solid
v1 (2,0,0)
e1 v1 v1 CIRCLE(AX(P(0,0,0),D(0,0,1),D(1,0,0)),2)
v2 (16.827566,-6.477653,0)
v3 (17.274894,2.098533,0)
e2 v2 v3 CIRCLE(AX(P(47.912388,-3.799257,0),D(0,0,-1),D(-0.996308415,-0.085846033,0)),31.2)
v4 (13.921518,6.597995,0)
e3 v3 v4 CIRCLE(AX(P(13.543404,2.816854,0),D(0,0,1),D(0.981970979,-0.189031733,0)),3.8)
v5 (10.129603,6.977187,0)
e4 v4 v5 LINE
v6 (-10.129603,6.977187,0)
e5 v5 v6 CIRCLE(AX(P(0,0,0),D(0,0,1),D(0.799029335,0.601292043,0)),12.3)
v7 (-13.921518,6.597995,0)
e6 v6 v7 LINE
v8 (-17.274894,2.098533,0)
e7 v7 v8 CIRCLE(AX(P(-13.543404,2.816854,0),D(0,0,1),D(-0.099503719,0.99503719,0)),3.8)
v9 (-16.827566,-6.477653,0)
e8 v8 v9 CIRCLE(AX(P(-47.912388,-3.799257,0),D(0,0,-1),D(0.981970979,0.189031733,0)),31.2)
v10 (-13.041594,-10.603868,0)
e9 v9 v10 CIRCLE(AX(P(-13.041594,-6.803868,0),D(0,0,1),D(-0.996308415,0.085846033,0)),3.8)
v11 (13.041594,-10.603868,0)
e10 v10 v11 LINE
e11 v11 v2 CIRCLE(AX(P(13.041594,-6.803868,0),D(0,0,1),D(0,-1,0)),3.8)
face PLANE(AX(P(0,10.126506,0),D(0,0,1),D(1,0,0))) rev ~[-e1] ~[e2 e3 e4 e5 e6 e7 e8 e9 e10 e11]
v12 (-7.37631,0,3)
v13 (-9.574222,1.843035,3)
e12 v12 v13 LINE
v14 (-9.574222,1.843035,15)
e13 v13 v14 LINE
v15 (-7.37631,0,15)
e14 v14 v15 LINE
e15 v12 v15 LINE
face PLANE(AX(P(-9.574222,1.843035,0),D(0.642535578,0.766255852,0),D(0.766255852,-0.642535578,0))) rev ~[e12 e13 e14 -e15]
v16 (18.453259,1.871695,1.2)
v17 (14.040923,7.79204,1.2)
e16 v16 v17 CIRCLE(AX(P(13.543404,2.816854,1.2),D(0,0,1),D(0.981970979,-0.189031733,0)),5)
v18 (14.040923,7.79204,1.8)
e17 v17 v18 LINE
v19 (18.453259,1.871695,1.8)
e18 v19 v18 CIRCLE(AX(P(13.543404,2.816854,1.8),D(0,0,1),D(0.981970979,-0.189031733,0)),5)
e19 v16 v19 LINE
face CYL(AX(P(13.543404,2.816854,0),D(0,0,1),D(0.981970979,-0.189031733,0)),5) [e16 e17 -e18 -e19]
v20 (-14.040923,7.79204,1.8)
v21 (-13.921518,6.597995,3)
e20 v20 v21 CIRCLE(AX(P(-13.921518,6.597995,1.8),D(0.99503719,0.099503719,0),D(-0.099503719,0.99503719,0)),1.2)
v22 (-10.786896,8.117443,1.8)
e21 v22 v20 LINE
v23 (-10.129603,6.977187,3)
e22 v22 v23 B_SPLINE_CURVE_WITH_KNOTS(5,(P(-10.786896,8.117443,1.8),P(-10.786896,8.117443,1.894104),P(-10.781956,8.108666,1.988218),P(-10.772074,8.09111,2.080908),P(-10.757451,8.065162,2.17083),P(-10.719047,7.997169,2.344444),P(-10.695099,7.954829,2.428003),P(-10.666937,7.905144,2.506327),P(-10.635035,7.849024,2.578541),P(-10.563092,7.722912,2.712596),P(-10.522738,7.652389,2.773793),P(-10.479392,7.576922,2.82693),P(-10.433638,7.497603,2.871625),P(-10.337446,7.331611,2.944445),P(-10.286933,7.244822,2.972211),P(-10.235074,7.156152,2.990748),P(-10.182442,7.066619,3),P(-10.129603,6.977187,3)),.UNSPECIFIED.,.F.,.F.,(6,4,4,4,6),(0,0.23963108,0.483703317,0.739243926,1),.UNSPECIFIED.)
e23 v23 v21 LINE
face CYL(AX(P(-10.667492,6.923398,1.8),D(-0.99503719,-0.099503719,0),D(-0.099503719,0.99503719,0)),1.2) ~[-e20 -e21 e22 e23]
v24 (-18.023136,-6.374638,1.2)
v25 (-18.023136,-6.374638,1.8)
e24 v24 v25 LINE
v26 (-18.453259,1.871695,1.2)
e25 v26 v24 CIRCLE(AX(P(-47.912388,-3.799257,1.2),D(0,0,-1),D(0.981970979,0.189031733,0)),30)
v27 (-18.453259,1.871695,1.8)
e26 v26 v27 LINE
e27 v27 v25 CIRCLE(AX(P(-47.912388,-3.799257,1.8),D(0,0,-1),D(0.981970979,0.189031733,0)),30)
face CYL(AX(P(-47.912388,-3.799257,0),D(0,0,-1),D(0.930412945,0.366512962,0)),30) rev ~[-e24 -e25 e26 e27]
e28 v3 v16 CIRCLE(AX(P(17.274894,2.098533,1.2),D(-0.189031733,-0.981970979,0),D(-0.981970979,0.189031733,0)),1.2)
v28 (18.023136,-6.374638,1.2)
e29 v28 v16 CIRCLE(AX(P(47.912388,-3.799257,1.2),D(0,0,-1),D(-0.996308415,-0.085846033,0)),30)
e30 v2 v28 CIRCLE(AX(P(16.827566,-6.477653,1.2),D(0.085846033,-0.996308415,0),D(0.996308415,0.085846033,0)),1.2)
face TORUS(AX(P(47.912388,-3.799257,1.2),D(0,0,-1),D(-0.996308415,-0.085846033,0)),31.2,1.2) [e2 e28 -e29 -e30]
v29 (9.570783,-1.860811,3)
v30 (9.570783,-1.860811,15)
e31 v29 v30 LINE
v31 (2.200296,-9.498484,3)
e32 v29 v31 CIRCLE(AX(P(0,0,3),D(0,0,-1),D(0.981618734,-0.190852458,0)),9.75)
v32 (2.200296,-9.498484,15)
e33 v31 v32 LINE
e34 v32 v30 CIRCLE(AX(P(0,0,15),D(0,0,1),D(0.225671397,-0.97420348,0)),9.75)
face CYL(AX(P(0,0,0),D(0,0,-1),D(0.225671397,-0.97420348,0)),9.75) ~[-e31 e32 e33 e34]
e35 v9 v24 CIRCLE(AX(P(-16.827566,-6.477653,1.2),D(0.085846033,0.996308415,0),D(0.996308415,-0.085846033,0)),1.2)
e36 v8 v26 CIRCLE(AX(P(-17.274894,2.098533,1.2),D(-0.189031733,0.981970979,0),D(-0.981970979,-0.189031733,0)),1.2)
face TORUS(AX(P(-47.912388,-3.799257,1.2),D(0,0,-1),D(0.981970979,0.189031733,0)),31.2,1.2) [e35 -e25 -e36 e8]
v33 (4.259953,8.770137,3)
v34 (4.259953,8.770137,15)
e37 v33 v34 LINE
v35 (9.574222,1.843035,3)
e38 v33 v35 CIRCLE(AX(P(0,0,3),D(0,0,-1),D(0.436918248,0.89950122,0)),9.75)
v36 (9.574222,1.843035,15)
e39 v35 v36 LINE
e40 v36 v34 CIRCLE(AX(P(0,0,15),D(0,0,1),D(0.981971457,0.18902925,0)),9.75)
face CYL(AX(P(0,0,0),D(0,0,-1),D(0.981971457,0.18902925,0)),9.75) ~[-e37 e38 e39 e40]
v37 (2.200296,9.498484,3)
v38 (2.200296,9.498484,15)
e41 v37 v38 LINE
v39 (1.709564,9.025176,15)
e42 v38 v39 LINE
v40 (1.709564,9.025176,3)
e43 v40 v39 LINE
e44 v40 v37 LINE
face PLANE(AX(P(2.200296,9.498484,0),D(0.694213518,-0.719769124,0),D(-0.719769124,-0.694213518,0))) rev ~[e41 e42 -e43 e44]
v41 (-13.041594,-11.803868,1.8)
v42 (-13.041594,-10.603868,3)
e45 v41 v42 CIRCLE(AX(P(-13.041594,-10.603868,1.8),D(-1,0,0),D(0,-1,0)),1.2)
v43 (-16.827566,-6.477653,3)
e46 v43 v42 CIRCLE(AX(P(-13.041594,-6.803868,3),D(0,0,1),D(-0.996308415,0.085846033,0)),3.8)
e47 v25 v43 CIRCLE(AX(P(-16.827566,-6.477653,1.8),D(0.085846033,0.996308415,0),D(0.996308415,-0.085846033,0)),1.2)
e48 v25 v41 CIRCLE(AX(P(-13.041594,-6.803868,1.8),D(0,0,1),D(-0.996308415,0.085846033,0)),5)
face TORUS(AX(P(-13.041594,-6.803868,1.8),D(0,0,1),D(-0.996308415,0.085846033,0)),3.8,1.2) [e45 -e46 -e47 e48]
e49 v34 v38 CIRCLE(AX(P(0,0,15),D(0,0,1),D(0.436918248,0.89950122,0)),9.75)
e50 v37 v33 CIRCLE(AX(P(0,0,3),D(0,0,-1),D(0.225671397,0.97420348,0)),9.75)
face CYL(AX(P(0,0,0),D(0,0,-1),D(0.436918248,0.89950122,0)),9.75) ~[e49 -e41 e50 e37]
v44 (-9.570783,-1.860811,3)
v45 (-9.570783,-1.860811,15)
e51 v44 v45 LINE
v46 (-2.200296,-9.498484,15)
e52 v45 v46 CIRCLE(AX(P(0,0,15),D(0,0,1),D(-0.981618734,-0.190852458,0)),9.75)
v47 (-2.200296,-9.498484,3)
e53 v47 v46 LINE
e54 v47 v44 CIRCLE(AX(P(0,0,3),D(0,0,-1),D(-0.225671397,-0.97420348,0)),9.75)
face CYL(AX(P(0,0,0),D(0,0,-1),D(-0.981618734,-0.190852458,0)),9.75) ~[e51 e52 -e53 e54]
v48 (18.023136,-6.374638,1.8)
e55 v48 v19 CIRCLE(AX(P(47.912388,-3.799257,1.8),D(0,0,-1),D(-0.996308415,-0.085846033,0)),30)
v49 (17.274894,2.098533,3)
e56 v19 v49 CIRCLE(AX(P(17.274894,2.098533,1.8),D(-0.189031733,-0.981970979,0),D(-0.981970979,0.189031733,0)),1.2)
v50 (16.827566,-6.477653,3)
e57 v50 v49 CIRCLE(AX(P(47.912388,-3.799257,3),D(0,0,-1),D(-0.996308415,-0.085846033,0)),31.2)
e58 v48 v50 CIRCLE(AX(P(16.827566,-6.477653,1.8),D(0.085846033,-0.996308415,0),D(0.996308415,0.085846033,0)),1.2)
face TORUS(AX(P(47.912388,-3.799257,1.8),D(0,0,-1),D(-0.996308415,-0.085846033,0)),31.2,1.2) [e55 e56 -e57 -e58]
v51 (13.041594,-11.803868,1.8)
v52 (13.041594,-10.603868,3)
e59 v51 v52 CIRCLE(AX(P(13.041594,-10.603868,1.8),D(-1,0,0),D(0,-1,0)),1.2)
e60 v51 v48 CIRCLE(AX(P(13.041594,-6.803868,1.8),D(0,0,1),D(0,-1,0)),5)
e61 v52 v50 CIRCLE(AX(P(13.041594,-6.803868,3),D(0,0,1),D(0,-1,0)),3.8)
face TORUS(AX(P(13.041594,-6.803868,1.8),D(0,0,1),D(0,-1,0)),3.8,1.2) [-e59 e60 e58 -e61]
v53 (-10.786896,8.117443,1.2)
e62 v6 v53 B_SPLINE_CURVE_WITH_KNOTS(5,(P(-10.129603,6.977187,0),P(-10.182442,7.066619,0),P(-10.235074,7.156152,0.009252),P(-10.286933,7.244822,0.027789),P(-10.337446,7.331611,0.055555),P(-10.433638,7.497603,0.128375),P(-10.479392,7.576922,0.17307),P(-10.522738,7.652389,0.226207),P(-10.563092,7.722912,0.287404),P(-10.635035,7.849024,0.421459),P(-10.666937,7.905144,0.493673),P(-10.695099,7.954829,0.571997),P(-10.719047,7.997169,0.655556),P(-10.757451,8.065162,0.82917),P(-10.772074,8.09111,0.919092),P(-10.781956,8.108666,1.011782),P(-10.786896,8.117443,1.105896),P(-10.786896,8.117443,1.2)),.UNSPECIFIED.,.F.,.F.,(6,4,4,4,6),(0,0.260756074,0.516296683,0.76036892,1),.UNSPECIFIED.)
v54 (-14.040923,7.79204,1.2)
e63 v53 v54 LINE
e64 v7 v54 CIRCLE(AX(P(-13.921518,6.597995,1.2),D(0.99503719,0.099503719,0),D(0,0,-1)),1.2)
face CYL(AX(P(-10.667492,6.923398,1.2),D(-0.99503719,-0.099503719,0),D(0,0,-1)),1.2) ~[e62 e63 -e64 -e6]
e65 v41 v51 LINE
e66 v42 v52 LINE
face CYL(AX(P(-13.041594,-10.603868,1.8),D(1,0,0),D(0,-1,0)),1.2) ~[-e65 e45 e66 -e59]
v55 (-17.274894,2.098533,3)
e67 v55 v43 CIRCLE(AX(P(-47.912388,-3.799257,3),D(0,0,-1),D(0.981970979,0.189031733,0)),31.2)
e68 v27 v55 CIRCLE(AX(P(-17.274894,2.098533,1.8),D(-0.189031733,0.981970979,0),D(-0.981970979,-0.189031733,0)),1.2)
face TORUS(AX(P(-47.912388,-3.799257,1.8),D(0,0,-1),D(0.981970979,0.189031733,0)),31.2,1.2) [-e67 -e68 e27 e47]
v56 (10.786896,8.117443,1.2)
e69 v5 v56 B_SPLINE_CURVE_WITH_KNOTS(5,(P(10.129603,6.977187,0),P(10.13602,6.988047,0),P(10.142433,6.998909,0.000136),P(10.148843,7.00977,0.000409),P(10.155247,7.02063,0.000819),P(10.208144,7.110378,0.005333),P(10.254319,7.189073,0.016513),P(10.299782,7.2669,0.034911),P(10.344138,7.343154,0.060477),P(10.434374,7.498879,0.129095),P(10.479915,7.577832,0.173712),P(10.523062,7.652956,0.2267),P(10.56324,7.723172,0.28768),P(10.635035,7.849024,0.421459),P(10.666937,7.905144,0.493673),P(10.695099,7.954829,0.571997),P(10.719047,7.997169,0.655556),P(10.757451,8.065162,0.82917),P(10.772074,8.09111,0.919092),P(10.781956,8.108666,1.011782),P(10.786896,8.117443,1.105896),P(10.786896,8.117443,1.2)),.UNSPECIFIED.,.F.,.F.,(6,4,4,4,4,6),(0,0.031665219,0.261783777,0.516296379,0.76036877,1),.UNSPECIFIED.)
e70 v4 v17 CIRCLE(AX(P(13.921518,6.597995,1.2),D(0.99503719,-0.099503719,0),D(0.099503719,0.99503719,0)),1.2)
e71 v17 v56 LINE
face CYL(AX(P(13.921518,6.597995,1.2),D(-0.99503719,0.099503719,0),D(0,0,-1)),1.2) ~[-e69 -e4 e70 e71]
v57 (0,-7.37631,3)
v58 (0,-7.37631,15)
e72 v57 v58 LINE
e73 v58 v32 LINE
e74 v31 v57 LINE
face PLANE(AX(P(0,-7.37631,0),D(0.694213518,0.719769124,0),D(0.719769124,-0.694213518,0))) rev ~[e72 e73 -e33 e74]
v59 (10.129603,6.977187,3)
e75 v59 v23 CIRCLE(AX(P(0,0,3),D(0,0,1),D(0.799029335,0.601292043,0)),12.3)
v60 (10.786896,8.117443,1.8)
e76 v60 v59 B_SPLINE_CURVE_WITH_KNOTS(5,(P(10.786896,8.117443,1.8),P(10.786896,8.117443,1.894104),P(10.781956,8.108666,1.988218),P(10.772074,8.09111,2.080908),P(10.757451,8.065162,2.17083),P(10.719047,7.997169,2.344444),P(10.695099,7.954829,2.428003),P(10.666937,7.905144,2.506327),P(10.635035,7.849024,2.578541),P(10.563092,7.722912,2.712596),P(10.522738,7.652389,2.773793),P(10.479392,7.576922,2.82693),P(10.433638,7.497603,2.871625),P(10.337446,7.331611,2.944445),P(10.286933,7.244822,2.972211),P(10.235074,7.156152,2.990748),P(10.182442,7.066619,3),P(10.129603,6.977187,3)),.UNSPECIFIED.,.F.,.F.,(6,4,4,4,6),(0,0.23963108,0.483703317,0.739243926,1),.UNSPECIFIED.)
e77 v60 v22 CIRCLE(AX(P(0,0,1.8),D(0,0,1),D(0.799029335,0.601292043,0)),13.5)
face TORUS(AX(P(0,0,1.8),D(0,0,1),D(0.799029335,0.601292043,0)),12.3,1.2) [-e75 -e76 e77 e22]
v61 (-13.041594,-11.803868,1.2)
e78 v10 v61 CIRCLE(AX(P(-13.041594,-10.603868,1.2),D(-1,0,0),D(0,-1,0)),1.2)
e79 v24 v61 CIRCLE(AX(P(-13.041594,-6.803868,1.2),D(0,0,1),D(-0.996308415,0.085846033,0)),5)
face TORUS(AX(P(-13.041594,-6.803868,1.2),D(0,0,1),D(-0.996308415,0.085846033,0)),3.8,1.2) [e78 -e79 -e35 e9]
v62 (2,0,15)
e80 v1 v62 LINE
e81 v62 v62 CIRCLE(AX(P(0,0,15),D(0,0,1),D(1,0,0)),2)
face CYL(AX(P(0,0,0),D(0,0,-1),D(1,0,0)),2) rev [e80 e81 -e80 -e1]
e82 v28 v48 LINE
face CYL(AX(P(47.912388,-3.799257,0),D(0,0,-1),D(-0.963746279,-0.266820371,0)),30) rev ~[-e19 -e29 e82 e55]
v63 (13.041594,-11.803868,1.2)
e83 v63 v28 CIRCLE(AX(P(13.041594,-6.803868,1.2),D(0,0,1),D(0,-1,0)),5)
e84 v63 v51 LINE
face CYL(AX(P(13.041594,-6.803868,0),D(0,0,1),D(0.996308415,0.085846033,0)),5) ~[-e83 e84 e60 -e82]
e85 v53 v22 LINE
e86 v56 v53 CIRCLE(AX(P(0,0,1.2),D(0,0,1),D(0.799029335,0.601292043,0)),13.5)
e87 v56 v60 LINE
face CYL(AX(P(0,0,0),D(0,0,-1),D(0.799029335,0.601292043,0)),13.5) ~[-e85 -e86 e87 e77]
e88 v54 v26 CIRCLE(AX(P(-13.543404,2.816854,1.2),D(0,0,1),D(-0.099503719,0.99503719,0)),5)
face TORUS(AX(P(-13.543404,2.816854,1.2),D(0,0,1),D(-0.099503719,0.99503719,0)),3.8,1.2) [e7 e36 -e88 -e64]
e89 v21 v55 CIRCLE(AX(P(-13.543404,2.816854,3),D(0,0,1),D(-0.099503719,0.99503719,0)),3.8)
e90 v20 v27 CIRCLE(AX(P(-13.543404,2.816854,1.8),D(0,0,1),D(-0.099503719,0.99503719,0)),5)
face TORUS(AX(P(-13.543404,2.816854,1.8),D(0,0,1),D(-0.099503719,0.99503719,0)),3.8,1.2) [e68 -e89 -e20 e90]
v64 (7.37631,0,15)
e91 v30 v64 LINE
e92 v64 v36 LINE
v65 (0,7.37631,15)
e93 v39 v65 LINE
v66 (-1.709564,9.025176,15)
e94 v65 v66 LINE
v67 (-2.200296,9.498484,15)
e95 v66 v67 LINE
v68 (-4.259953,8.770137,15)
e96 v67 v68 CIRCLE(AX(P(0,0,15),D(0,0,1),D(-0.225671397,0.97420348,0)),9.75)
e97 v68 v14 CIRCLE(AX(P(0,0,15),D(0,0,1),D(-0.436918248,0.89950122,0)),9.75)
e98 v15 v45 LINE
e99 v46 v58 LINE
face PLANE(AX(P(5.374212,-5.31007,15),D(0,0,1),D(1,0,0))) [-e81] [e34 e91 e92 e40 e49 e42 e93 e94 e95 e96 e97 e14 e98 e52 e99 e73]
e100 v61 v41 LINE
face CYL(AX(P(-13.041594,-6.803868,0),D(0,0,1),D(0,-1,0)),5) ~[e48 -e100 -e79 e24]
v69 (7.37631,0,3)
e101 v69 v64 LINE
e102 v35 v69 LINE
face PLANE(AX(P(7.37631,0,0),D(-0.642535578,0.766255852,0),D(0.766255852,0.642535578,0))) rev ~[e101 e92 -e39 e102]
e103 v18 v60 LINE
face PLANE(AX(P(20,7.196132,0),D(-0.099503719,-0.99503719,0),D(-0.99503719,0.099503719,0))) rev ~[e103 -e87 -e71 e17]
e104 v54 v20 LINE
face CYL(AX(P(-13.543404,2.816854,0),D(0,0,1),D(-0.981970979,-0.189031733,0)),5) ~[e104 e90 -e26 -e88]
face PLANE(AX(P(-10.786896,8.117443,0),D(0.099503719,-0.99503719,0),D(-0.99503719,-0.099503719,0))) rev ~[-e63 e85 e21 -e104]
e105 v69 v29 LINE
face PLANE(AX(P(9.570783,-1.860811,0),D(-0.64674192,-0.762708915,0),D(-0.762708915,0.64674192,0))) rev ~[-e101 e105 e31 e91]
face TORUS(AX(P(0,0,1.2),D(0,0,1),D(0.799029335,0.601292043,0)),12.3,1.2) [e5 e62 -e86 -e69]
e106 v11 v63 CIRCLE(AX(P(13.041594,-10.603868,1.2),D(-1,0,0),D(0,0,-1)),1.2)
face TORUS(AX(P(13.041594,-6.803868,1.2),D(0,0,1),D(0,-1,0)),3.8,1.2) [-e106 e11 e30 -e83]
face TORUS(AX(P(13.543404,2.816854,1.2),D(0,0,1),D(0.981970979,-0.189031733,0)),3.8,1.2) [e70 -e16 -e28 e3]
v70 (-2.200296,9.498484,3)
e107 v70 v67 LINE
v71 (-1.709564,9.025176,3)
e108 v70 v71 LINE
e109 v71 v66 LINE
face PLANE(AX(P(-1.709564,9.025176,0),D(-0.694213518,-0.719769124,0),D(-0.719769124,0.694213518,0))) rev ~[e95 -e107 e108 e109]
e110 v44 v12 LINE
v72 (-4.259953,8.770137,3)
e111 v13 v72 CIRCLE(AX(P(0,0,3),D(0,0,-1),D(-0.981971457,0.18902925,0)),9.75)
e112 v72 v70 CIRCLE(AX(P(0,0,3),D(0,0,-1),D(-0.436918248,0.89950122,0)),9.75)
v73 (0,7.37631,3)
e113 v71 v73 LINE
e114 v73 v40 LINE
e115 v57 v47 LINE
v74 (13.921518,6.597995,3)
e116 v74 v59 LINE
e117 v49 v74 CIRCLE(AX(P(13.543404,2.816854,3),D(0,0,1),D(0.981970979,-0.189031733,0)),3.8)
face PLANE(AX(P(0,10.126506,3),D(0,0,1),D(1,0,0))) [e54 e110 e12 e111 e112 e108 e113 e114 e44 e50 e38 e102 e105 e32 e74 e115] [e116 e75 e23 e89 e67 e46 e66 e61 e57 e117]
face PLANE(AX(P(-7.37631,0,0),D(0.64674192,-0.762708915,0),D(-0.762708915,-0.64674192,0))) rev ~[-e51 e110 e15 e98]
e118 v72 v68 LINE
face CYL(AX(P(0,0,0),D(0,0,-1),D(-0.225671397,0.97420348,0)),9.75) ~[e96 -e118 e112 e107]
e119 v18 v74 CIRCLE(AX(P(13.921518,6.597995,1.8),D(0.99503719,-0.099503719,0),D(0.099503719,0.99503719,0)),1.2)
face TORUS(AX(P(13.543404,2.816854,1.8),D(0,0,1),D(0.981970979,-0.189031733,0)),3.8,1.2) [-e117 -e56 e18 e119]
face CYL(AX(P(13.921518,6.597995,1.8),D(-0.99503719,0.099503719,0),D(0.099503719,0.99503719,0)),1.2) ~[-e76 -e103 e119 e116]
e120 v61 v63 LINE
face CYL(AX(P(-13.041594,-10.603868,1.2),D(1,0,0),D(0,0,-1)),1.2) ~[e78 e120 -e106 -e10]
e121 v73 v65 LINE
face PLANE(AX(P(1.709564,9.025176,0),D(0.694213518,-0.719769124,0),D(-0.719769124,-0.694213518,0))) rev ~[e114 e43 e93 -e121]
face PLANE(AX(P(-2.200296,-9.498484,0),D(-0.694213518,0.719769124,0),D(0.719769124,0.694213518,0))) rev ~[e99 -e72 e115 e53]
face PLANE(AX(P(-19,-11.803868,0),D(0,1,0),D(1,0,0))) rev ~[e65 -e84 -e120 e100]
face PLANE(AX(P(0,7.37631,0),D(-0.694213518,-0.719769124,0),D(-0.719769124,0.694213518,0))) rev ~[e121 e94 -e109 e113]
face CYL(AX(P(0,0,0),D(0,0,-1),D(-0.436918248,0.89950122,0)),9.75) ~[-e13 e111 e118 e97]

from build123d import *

# Parameters (mm, degrees)
F0_R     = 2
F1_DEPTH = 15
F2_DEPTH = 3
F3_R     = 5
F4_R     = 5
F5_R     = 1.2


with BuildPart() as f1:
    # F0 (on Top) → F1 (new body)
    with BuildSketch(Plane.XY):
        with BuildLine():
            Line((9.5707826587, -1.8608114628), (7.3763099499, 0))
            ThreePointArc((7.3763099499, 0), (5.2158387857, -5.2158387857), (0, -7.3763099499))
            Line((0, -7.3763099499), (2.2002961183, -9.4984839312))
            ThreePointArc((2.2002961183, -9.4984839312), (7.0159164816, -6.770481218), (9.5707826587, -1.8608114628))
        make_face()
        with BuildLine():
            ThreePointArc((0, -7.3763099499), (5.2158387857, -5.2158387857), (7.3763099499, 0))
            ThreePointArc((7.3763099499, 0), (5.2158387857, 5.2158387857), (0, 7.3763099499))
            ThreePointArc((0, 7.3763099499), (-5.2158387857, 5.2158387857), (-7.3763099499, 0))
            ThreePointArc((-7.3763099499, 0), (-5.2158387857, -5.2158387857), (0, -7.3763099499))
        make_face()
        Circle(F0_R, mode=Mode.SUBTRACT)
        with BuildLine():
            ThreePointArc((9.5742217065, 1.8430351908), (7.7357792995, 5.9346624697), (4.2599529151, 8.7701368952))
            Line((4.2599529151, 8.7701368952), (1.7095643673, 9.02517575))
            Line((1.7095643673, 9.02517575), (0, 7.3763099499))
            ThreePointArc((0, 7.3763099499), (5.2158387857, 5.2158387857), (7.3763099499, 0))
            Line((7.3763099499, 0), (9.5742217065, 1.8430351908))
        make_face()
        with BuildLine():
            Line((1.7095643673, 9.02517575), (4.2599529151, 8.7701368952))
            ThreePointArc((4.2599529151, 8.7701368952), (3.2505886766, 9.1921800056), (2.2002961183, 9.4984839312))
            Line((2.2002961183, 9.4984839312), (1.7095643673, 9.02517575))
        make_face()
        with BuildLine():
            Line((-1.7095643673, 9.02517575), (-4.2599529151, 8.7701368952))
            ThreePointArc((-4.2599529151, 8.7701368952), (-7.7357792995, 5.9346624697), (-9.5742217065, 1.8430351908))
            Line((-9.5742217065, 1.8430351908), (-7.3763099499, 0))
            ThreePointArc((-7.3763099499, 0), (-5.2158387857, 5.2158387857), (0, 7.3763099499))
            Line((0, 7.3763099499), (-1.7095643673, 9.02517575))
        make_face()
        with BuildLine():
            ThreePointArc((-2.2002961183, 9.4984839312), (-3.2505886766, 9.1921800056), (-4.2599529151, 8.7701368952))
            Line((-4.2599529151, 8.7701368952), (-1.7095643673, 9.02517575))
            Line((-1.7095643673, 9.02517575), (-2.2002961183, 9.4984839312))
        make_face()
        with BuildLine():
            Line((-7.3763099499, 0), (-9.5707826587, -1.8608114628))
            ThreePointArc((-9.5707826587, -1.8608114628), (-7.0159164816, -6.770481218), (-2.2002961183, -9.4984839312))
            Line((-2.2002961183, -9.4984839312), (0, -7.3763099499))
            ThreePointArc((0, -7.3763099499), (-5.2158387857, -5.2158387857), (-7.3763099499, 0))
        make_face()
    extrude(amount=F1_DEPTH)

    # F0 (on Top) → F2 (join)
    with BuildSketch(Plane.XY):
        with BuildLine():
            Line((4.2599529151, 8.7701368952), (10.7868960269, 8.1174425841))
            ThreePointArc((10.7868960269, 8.1174425841), (0, 13.5), (-10.7868960269, 8.1174425841))
            Line((-10.7868960269, 8.1174425841), (-4.2599529151, 8.7701368952))
            ThreePointArc((-4.2599529151, 8.7701368952), (-3.2505886766, 9.1921800056), (-2.2002961183, 9.4984839312))
            ThreePointArc((-2.2002961183, 9.4984839312), (0, 9.75), (2.2002961183, 9.4984839312))
            ThreePointArc((2.2002961183, 9.4984839312), (3.2505886766, 9.1921800056), (4.2599529151, 8.7701368952))
        make_face()
        Polygon((0, 7.3763099499), (1.7095643673, 9.02517575), (0, 9.1961321867), (-1.7095643673, 9.02517575), align=None)
        with BuildLine():
            Line((1.7095643673, 9.02517575), (2.2002961183, 9.4984839312))
            ThreePointArc((2.2002961183, 9.4984839312), (0, 9.75), (-2.2002961183, 9.4984839312))
            Line((-2.2002961183, 9.4984839312), (-1.7095643673, 9.02517575))
            Line((-1.7095643673, 9.02517575), (0, 9.1961321867))
            Line((0, 9.1961321867), (1.7095643673, 9.02517575))
        make_face()
        with BuildLine():
            ThreePointArc((8.2654431298, -10.6739144585), (12.1209216286, -5.9441785701), (13.5, 0))
            ThreePointArc((13.5, 0), (12.8037708579, 4.2794219024), (10.7868960269, 8.1174425841))
            Line((10.7868960269, 8.1174425841), (4.2599529151, 8.7701368952))
            ThreePointArc((4.2599529151, 8.7701368952), (7.7357792995, 5.9346624697), (9.5742217065, 1.8430351908))
            ThreePointArc((9.5742217065, 1.8430351908), (9.7059559457, 0.9256992928), (9.75, 0))
            ThreePointArc((9.75, 0), (9.7050922438, -0.9347109387), (9.5707826587, -1.8608114628))
            ThreePointArc((9.5707826587, -1.8608114628), (7.0159164816, -6.770481218), (2.2002961183, -9.4984839312))
            ThreePointArc((2.2002961183, -9.4984839312), (0, -9.75), (-2.2002961183, -9.4984839312))
            ThreePointArc((-2.2002961183, -9.4984839312), (-7.0159164816, -6.770481218), (-9.5707826587, -1.8608114628))
            ThreePointArc((-9.5707826587, -1.8608114628), (-9.7499957971, -0.0090529401), (-9.5742217065, 1.8430351908))
            ThreePointArc((-9.5742217065, 1.8430351908), (-7.7357792995, 5.9346624697), (-4.2599529151, 8.7701368952))
            Line((-4.2599529151, 8.7701368952), (-10.7868960269, 8.1174425841))
            ThreePointArc((-10.7868960269, 8.1174425841), (-13.3800852655, -1.7953602115), (-8.2654431298, -10.6739144585))
            Line((-8.2654431298, -10.6739144585), (0, -9.8038678133))
            Line((0, -9.8038678133), (8.2654431298, -10.6739144585))
        make_face()
        with BuildLine():
            ThreePointArc((-8.2654431298, -10.6739144585), (-13.3800852655, -1.7953602115), (-10.7868960269, 8.1174425841))
            Line((-10.7868960269, 8.1174425841), (-20, 7.1961321867))
            ThreePointArc((-20, 7.1961321867), (-17.9538534771, -2.2224916805), (-19, -11.8038678133))
            Line((-19, -11.8038678133), (-8.2654431298, -10.6739144585))
        make_face()
        with BuildLine():
            ThreePointArc((-6.5512368792, -11.8038678133), (-7.4298519681, -11.2715260605), (-8.2654431298, -10.6739144585))
            Line((-8.2654431298, -10.6739144585), (-19, -11.8038678133))
            Line((-19, -11.8038678133), (-6.5512368792, -11.8038678133))
        make_face()
        with BuildLine():
            Line((19, -11.8038678133), (8.2654431298, -10.6739144585))
            ThreePointArc((8.2654431298, -10.6739144585), (7.4298519681, -11.2715260605), (6.5512368792, -11.8038678133))
            Line((6.5512368792, -11.8038678133), (19, -11.8038678133))
        make_face()
        with BuildLine():
            ThreePointArc((6.5512368792, -11.8038678133), (7.4298519681, -11.2715260605), (8.2654431298, -10.6739144585))
            Line((8.2654431298, -10.6739144585), (0, -9.8038678133))
            Line((0, -9.8038678133), (-8.2654431298, -10.6739144585))
            ThreePointArc((-8.2654431298, -10.6739144585), (-7.4298519681, -11.2715260605), (-6.5512368792, -11.8038678133))
            Line((-6.5512368792, -11.8038678133), (6.5512368792, -11.8038678133))
        make_face()
        with BuildLine():
            ThreePointArc((10.7868960269, 8.1174425841), (12.8037708579, 4.2794219024), (13.5, 0))
            ThreePointArc((13.5, 0), (12.1209216286, -5.9441785701), (8.2654431298, -10.6739144585))
            Line((8.2654431298, -10.6739144585), (19, -11.8038678133))
            ThreePointArc((19, -11.8038678133), (17.9538534771, -2.2224916805), (20, 7.1961321867))
            Line((20, 7.1961321867), (10.7868960269, 8.1174425841))
        make_face()
        with BuildLine():
            ThreePointArc((9.75, 0), (9.7059559457, 0.9256992928), (9.5742217065, 1.8430351908))
            Line((9.5742217065, 1.8430351908), (7.3763099499, 0))
            Line((7.3763099499, 0), (9.5707826587, -1.8608114628))
            ThreePointArc((9.5707826587, -1.8608114628), (9.7050922438, -0.9347109387), (9.75, 0))
        make_face()
        with BuildLine():
            Line((-7.3763099499, 0), (-9.5742217065, 1.8430351908))
            ThreePointArc((-9.5742217065, 1.8430351908), (-9.7499957971, -0.0090529401), (-9.5707826587, -1.8608114628))
            Line((-9.5707826587, -1.8608114628), (-7.3763099499, 0))
        make_face()
        with BuildLine():
            Line((2.2002961183, -9.4984839312), (0, -7.3763099499))
            Line((0, -7.3763099499), (-2.2002961183, -9.4984839312))
            ThreePointArc((-2.2002961183, -9.4984839312), (0, -9.75), (2.2002961183, -9.4984839312))
        make_face()
    extrude(amount=F2_DEPTH)

    # F3
    f3_edges = [f1.edges().sort_by_distance(p)[0] for p in [
        (19, -11.803868, 1.5),
    ]]
    fillet(f3_edges, radius=F3_R)

    # F4
    f4_edges = [f1.edges().sort_by_distance(p)[0] for p in [
        (-19, -11.803868, 1.5),
        (20, 7.196132, 1.5),
        (-20, 7.196132, 1.5),
    ]]
    fillet(f4_edges, radius=F4_R)

    # F5
    f5_edges = [f1.edges().sort_by_distance(p)[0] for p in [
        (0, -11.803868, 3),
        (0, 13.5, 3),
        (0, -11.803868, 0),
        (0, 13.5, 0),
    ]]
    fillet(f5_edges, radius=F5_R)


solid = f1.part
